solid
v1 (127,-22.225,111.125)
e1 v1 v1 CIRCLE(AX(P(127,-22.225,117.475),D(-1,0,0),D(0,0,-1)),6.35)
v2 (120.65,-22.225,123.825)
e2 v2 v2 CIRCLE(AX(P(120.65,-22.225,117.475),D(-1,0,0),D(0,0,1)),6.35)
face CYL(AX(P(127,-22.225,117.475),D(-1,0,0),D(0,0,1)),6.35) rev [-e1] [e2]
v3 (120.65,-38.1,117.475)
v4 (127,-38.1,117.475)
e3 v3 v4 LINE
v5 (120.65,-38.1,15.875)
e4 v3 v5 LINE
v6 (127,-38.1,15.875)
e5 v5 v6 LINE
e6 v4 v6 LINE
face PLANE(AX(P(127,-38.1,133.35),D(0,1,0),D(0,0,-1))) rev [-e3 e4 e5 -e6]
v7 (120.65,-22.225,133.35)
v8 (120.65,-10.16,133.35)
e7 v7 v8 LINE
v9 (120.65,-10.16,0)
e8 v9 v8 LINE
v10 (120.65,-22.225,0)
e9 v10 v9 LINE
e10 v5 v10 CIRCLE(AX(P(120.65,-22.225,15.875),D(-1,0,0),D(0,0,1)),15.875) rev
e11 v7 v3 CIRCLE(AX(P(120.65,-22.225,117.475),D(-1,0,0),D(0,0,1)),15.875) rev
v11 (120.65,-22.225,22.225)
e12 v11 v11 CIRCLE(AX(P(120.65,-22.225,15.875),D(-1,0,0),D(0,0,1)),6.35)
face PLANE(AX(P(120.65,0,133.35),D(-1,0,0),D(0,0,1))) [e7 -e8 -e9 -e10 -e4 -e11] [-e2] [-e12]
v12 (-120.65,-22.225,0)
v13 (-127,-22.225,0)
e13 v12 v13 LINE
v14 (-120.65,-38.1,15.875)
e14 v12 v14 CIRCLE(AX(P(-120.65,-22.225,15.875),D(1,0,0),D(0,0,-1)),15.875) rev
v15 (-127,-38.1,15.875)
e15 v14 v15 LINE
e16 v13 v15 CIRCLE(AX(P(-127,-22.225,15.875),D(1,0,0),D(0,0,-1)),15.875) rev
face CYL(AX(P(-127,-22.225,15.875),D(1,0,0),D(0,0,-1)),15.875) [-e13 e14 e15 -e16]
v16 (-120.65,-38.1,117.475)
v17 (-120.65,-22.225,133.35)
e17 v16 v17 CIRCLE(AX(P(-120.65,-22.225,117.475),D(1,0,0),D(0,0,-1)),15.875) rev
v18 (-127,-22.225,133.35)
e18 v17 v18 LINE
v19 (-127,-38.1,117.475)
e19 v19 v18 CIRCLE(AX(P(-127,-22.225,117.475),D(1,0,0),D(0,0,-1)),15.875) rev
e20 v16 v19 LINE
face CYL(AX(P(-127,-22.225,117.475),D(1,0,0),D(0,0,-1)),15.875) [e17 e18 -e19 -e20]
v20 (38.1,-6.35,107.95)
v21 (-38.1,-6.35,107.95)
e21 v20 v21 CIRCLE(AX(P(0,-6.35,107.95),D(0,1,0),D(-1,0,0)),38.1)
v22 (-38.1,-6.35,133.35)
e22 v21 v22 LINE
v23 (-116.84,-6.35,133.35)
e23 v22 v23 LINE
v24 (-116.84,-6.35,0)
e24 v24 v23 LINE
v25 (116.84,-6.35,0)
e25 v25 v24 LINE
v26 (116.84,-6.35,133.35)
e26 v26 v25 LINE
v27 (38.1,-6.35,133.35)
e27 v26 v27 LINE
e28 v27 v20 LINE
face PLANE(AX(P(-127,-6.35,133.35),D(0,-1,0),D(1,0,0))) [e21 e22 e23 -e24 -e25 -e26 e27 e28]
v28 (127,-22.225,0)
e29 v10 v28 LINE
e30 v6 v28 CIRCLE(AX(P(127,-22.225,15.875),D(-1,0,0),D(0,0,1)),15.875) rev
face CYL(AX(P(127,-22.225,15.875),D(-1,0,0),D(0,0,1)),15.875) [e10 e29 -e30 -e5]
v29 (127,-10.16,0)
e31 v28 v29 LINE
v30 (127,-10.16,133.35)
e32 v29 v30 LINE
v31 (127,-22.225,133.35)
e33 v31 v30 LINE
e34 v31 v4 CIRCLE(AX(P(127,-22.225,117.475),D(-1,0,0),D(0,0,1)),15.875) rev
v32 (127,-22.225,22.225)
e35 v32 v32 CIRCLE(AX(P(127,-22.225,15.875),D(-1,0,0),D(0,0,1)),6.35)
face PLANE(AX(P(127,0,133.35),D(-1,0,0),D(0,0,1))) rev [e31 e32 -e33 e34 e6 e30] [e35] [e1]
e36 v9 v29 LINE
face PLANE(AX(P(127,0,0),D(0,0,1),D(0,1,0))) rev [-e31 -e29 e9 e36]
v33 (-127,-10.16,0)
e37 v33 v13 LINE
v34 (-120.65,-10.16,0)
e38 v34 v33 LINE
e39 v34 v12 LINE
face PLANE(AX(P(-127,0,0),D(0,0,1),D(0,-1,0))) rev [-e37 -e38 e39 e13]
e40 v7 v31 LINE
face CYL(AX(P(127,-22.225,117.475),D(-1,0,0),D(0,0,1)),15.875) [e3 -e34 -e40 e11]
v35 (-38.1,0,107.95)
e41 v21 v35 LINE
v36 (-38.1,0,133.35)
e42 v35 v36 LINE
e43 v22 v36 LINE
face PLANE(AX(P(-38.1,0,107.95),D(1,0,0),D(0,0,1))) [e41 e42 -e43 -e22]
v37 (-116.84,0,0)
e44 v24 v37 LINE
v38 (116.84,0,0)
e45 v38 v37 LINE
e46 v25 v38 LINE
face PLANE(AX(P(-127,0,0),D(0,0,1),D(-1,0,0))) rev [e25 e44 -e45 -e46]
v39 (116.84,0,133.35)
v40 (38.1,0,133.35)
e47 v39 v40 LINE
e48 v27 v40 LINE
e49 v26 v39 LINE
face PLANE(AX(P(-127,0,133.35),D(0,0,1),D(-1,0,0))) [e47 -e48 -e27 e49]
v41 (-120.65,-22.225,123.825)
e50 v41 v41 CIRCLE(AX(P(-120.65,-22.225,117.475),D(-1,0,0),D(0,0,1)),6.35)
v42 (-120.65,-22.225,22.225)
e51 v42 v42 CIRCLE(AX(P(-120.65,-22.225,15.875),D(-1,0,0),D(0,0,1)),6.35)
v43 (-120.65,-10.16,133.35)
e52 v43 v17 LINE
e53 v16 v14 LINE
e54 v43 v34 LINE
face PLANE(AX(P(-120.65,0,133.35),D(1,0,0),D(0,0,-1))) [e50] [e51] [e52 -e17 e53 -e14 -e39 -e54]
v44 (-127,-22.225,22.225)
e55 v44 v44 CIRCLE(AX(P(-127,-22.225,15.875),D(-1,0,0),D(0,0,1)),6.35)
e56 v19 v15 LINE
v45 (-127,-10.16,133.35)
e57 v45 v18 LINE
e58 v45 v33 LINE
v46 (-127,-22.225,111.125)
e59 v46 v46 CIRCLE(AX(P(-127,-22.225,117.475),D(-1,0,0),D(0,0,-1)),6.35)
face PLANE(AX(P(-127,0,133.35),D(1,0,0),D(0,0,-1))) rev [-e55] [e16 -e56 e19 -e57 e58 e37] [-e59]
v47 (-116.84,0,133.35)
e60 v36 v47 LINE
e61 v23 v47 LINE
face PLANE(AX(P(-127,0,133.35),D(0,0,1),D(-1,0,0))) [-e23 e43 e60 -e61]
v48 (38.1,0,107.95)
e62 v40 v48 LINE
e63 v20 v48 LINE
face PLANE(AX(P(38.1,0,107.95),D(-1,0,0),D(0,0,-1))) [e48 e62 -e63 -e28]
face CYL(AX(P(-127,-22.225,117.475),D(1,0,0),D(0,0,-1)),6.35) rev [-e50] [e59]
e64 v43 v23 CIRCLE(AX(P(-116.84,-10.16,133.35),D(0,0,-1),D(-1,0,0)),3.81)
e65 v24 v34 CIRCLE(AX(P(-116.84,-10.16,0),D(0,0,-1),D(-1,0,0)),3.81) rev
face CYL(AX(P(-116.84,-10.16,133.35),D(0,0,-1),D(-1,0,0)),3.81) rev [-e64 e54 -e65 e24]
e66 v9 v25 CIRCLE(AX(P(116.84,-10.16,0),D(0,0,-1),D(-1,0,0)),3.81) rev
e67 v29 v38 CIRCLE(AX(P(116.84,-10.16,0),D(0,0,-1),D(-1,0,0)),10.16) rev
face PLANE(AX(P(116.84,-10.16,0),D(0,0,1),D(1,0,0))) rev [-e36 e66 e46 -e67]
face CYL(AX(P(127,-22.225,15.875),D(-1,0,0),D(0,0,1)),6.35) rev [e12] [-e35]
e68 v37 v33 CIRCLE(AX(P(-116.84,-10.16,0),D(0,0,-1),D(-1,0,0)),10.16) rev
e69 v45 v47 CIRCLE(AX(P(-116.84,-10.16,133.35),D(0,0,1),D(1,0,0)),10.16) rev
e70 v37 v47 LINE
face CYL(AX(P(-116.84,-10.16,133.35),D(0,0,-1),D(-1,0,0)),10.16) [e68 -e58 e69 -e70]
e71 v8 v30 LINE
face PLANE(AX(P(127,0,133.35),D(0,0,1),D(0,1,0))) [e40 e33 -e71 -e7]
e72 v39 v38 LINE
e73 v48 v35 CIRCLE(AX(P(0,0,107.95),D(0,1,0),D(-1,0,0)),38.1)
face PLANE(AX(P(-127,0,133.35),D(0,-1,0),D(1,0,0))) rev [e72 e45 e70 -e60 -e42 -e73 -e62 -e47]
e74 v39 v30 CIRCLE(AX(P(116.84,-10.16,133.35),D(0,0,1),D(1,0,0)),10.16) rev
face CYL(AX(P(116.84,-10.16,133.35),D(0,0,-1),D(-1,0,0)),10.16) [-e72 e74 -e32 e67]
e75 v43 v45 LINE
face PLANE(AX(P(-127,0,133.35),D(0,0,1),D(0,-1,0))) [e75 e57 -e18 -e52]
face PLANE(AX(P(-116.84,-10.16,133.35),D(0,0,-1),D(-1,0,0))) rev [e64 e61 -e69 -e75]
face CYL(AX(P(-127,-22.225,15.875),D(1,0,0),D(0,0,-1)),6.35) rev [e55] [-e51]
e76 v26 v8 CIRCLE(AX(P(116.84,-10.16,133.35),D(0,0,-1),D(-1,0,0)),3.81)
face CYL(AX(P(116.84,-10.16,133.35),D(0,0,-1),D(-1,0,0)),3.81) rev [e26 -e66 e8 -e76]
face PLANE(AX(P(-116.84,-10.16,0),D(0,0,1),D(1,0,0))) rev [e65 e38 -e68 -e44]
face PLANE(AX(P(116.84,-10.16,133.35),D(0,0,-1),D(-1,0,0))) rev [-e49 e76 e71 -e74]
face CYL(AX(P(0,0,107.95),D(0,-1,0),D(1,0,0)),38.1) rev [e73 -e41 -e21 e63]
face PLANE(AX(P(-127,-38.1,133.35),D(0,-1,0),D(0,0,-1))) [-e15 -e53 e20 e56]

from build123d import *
from build123d.topology import SkipClean

# Parameters (mm, degrees)
EXTRUDE_THIN1_DEPTH        = 133.35
CUT_EXTRUDE1_DEPTH         = 189.050079766
SKETCH3_R                  = 6.35
CUT_EXTRUDE2_DEPTH         = 290.395633174
FILLET1_R                  = 15.875
CONVERT_SOLID1_START       = -123.9798384
CONVERT_SOLID1_OUTLINE_W   = 3.81
CONVERT_SOLID1_OUTLINE_H   = 133.35
CONVERT_SOLID1_DEPTH       = 85.8798384
CONVERT_SOLID1_START_2     = 38.1
CONVERT_SOLID1_2_OUTLINE_W = 3.81
CONVERT_SOLID1_2_OUTLINE_H = 133.35
CONVERT_SOLID1_2_DEPTH     = 85.8798384
CONVERT_SOLID1_START_3     = -124.46
CONVERT_SOLID1_3_OUTLINE_R = 6.35
CONVERT_SOLID1_3_DEPTH     = 3.81
CONVERT_SOLID1_START_4     = 120.65
CONVERT_SOLID1_4_OUTLINE_R = 6.35
CONVERT_SOLID1_4_DEPTH     = 3.81
CONVERT_SOLID1_5_OUTLINE_W = 76.2
CONVERT_SOLID1_5_OUTLINE_H = 6.35
CONVERT_SOLID1_5_DEPTH     = 13.700379
CONVERT_SOLID1_START_5     = 12.969621
CONVERT_SOLID1_6_DEPTH     = 120.380379
CONVERT_SOLID1_START_6     = -6.35
CONVERT_SOLID1_7_DEPTH     = 3.81
CONVERT_SOLID1_START_7     = -1
CONVERT_SOLID1_8_DEPTH     = 134.35


with BuildPart() as part:
    # Sketch1 → Extrude-Thin1 (new body)
    with BuildSketch(Plane.XY):
        Polygon((-127, -38.1), (-127, 0), (127, 0), (127, -38.1), (124.46, -38.1), (124.46, -2.54), (-124.46, -2.54), (-124.46, -38.1), align=None)
    extrude(amount=EXTRUDE_THIN1_DEPTH)

    # Sketch2 → Cut-Extrude1 (cut, through all)
    with BuildSketch(Plane(origin=(0, 0, 0), x_dir=(1, 0, 0), z_dir=(0, 1, 0))):
        with BuildLine():
            Line((38.1, -107.95), (38.1, -133.35))
            Line((38.1, -133.35), (-38.1, -133.35))
            Line((-38.1, -133.35), (-38.1, -107.95))
            ThreePointArc((-38.1, -107.95), (0, -69.85), (38.1, -107.95))
        make_face()
    extrude(amount=-CUT_EXTRUDE1_DEPTH, mode=Mode.SUBTRACT)

    # Sketch3 → Cut-Extrude2 (cut, through all)
    with BuildSketch(Plane.ZY.offset(127)):
        with Locations((15.875, -22.225)):
            Circle(SKETCH3_R)
        with Locations((117.475, -22.225)):
            Circle(SKETCH3_R)
    extrude(amount=-CUT_EXTRUDE2_DEPTH, mode=Mode.SUBTRACT)

    # Fillet1
    fillet1_edges = [part.edges().sort_by_distance(p)[0] for p in [
        (125.73, -38.1, 133.35),
        (125.73, -38.1, 0),
        (-125.73, -38.1, 133.35),
        (-125.73, -38.1, 0),
    ]]
    fillet(fillet1_edges, radius=FILLET1_R)

    # Convert-Solid1: read off the stored shape, not the designer's step
    # Convert-Solid1 outline → Convert-Solid1 (add)
    with BuildSketch(Plane.YZ.offset(CONVERT_SOLID1_START)):
        with Locations((-4.445, 66.675)):
            Rectangle(CONVERT_SOLID1_OUTLINE_W, CONVERT_SOLID1_OUTLINE_H)
    extrude(amount=CONVERT_SOLID1_DEPTH)

    # Convert-Solid1 2 outline → Convert-Solid1 2 (add)
    with BuildSketch(Plane.YZ.offset(CONVERT_SOLID1_START_2)):
        with Locations((-4.445, 66.675)):
            Rectangle(CONVERT_SOLID1_2_OUTLINE_W, CONVERT_SOLID1_2_OUTLINE_H)
    extrude(amount=CONVERT_SOLID1_2_DEPTH)

    # Convert-Solid1 3 outline → Convert-Solid1 3 (add)
    with SkipClean():  # the faces are left unmerged after this step: merging them gives an invalid solid
        with BuildSketch(Plane.YZ.offset(CONVERT_SOLID1_START_3)):
            with BuildLine():
                Line((-22.225, 0), (-6.35, 0))
                Line((-6.35, 0), (-6.35, 133.35))
                Line((-6.35, 133.35), (-22.225, 133.35))
                ThreePointArc((-22.225, 133.35), (-33.450320151, 128.700320151), (-38.1, 117.475))
                Line((-38.1, 117.475), (-38.1, 15.875))
                ThreePointArc((-38.1, 15.875), (-33.450320151, 4.649679849), (-22.225, 0))
            make_face()
            with Locations((-22.225, 15.875)):
                Circle(CONVERT_SOLID1_3_OUTLINE_R, mode=Mode.SUBTRACT)
            with Locations((-22.225, 117.475)):
                Circle(CONVERT_SOLID1_3_OUTLINE_R, mode=Mode.SUBTRACT)
        extrude(amount=CONVERT_SOLID1_3_DEPTH)

    # Convert-Solid1 4 outline → Convert-Solid1 4 (add)
    with SkipClean():  # the faces are left unmerged after this step: merging them gives an invalid solid
        with BuildSketch(Plane.YZ.offset(CONVERT_SOLID1_START_4)):
            with BuildLine():
                Line((-22.225, 0), (-6.35, 0))
                Line((-6.35, 0), (-6.35, 133.35))
                Line((-6.35, 133.35), (-22.225, 133.35))
                ThreePointArc((-22.225, 133.35), (-33.450320151, 128.700320151), (-38.1, 117.475))
                Line((-38.1, 117.475), (-38.1, 15.875))
                ThreePointArc((-38.1, 15.875), (-33.450320151, 4.649679849), (-22.225, 0))
            make_face()
            with Locations((-22.225, 15.875)):
                Circle(CONVERT_SOLID1_4_OUTLINE_R, mode=Mode.SUBTRACT)
            with Locations((-22.225, 117.475)):
                Circle(CONVERT_SOLID1_4_OUTLINE_R, mode=Mode.SUBTRACT)
        extrude(amount=CONVERT_SOLID1_4_DEPTH)

    # Convert-Solid1 5 outline → Convert-Solid1 5 (add)
    with SkipClean():  # the faces are left unmerged after this step: merging them gives an invalid solid
        with BuildSketch(Plane.XY):
            with BuildLine():
                Line((120.65, -6.35), (116.84, -6.35))
                ThreePointArc((116.84, -6.35), (119.534076836, -7.465923164), (120.65, -10.16))
                Line((120.65, -10.16), (120.65, -6.35))
            make_face()
            with BuildLine():
                ThreePointArc((-120.65, -10.16), (-119.534076836, -7.465923164), (-116.84, -6.35))
                Line((-116.84, -6.35), (-120.65, -6.35))
                Line((-120.65, -6.35), (-120.65, -10.16))
            make_face()
            with Locations((0, -3.175)):
                Rectangle(CONVERT_SOLID1_5_OUTLINE_W, CONVERT_SOLID1_5_OUTLINE_H)
            with BuildLine():
                ThreePointArc((124.46, -3.43979167), (124.224290518, -3.181615262), (123.9798384, -2.931700918))
                Line((123.9798384, -2.931700918), (123.9798384, -6.35))
                Line((123.9798384, -6.35), (124.46, -6.35))
                Line((124.46, -6.35), (124.46, -3.43979167))
            make_face()
            with BuildLine():
                Line((-123.9798384, -6.35), (-123.9798384, -2.931700918))
                ThreePointArc((-123.9798384, -2.931700918), (-124.224290518, -3.181615262), (-124.46, -3.43979167))
                Line((-124.46, -3.43979167), (-124.46, -6.35))
                Line((-124.46, -6.35), (-123.9798384, -6.35))
            make_face()
        extrude(amount=CONVERT_SOLID1_5_DEPTH)

    # Convert-Solid1 6 outline → Convert-Solid1 6 (add)
    with SkipClean():  # the faces are left unmerged after this step: merging them gives an invalid solid
        with BuildSketch(Plane.XY.offset(CONVERT_SOLID1_START_5)):
            with BuildLine():
                Line((120.65, -6.35), (116.84, -6.35))
                ThreePointArc((116.84, -6.35), (119.534076836, -7.465923164), (120.65, -10.16))
                Line((120.65, -10.16), (120.65, -6.35))
            make_face()
            with BuildLine():
                ThreePointArc((-120.65, -10.16), (-119.534076836, -7.465923164), (-116.84, -6.35))
                Line((-116.84, -6.35), (-120.65, -6.35))
                Line((-120.65, -6.35), (-120.65, -10.16))
            make_face()
            with BuildLine():
                ThreePointArc((124.46, -3.43979167), (124.224290518, -3.181615262), (123.9798384, -2.931700918))
                Line((123.9798384, -2.931700918), (123.9798384, -6.35))
                Line((123.9798384, -6.35), (124.46, -6.35))
                Line((124.46, -6.35), (124.46, -3.43979167))
            make_face()
            with BuildLine():
                Line((-123.9798384, -6.35), (-123.9798384, -2.931700918))
                ThreePointArc((-123.9798384, -2.931700918), (-124.224290518, -3.181615262), (-124.46, -3.43979167))
                Line((-124.46, -3.43979167), (-124.46, -6.35))
                Line((-124.46, -6.35), (-123.9798384, -6.35))
            make_face()
        extrude(amount=CONVERT_SOLID1_6_DEPTH)

    # Convert-Solid1 7 outline → Convert-Solid1 7 (add)
    with SkipClean():  # the faces are left unmerged after this step: merging them gives an invalid solid
        with BuildSketch(Plane(origin=(0, 0, 0), x_dir=(1, 0, 0), z_dir=(0, 1, 0)).offset(CONVERT_SOLID1_START_6)):
            with BuildLine():
                ThreePointArc((-38.1, -107.95), (0, -69.85), (38.1, -107.95))
                Line((38.1, -107.95), (38.1, 0))
                Line((38.1, 0), (-38.1, 0))
                Line((-38.1, 0), (-38.1, -107.95))
            make_face()
        extrude(amount=CONVERT_SOLID1_7_DEPTH)

    # Convert-Solid1 8 outline → Convert-Solid1 8 (cut)
    with SkipClean():  # the faces are left unmerged after this step: merging them gives an invalid solid
        with BuildSketch(Plane.XY.offset(CONVERT_SOLID1_START_7)):
            with BuildLine():
                Line((127, 0), (116.84, 0))
                ThreePointArc((116.84, 0), (120.699150251, -0.761459723), (123.9798384, -2.931700918))
                Line((123.9798384, -2.931700918), (123.9798384, -2.54))
                Line((123.9798384, -2.54), (124.46, -2.54))
                Line((124.46, -2.54), (124.46, -3.43979167))
                ThreePointArc((124.46, -3.43979167), (126.343809762, -6.567897551), (127, -10.16))
                Line((127, -10.16), (127, 0))
            make_face()
            with BuildLine():
                ThreePointArc((-123.9798384, -2.931700918), (-120.699150251, -0.761459723), (-116.84, 0))
                Line((-116.84, 0), (-127, 0))
                Line((-127, 0), (-127, -10.16))
                ThreePointArc((-127, -10.16), (-126.343809762, -6.567897551), (-124.46, -3.43979167))
                Line((-124.46, -3.43979167), (-124.46, -2.54))
                Line((-124.46, -2.54), (-123.9798384, -2.54))
                Line((-123.9798384, -2.54), (-123.9798384, -2.931700918))
            make_face()
        extrude(amount=CONVERT_SOLID1_8_DEPTH, mode=Mode.SUBTRACT)


solid = part.part
